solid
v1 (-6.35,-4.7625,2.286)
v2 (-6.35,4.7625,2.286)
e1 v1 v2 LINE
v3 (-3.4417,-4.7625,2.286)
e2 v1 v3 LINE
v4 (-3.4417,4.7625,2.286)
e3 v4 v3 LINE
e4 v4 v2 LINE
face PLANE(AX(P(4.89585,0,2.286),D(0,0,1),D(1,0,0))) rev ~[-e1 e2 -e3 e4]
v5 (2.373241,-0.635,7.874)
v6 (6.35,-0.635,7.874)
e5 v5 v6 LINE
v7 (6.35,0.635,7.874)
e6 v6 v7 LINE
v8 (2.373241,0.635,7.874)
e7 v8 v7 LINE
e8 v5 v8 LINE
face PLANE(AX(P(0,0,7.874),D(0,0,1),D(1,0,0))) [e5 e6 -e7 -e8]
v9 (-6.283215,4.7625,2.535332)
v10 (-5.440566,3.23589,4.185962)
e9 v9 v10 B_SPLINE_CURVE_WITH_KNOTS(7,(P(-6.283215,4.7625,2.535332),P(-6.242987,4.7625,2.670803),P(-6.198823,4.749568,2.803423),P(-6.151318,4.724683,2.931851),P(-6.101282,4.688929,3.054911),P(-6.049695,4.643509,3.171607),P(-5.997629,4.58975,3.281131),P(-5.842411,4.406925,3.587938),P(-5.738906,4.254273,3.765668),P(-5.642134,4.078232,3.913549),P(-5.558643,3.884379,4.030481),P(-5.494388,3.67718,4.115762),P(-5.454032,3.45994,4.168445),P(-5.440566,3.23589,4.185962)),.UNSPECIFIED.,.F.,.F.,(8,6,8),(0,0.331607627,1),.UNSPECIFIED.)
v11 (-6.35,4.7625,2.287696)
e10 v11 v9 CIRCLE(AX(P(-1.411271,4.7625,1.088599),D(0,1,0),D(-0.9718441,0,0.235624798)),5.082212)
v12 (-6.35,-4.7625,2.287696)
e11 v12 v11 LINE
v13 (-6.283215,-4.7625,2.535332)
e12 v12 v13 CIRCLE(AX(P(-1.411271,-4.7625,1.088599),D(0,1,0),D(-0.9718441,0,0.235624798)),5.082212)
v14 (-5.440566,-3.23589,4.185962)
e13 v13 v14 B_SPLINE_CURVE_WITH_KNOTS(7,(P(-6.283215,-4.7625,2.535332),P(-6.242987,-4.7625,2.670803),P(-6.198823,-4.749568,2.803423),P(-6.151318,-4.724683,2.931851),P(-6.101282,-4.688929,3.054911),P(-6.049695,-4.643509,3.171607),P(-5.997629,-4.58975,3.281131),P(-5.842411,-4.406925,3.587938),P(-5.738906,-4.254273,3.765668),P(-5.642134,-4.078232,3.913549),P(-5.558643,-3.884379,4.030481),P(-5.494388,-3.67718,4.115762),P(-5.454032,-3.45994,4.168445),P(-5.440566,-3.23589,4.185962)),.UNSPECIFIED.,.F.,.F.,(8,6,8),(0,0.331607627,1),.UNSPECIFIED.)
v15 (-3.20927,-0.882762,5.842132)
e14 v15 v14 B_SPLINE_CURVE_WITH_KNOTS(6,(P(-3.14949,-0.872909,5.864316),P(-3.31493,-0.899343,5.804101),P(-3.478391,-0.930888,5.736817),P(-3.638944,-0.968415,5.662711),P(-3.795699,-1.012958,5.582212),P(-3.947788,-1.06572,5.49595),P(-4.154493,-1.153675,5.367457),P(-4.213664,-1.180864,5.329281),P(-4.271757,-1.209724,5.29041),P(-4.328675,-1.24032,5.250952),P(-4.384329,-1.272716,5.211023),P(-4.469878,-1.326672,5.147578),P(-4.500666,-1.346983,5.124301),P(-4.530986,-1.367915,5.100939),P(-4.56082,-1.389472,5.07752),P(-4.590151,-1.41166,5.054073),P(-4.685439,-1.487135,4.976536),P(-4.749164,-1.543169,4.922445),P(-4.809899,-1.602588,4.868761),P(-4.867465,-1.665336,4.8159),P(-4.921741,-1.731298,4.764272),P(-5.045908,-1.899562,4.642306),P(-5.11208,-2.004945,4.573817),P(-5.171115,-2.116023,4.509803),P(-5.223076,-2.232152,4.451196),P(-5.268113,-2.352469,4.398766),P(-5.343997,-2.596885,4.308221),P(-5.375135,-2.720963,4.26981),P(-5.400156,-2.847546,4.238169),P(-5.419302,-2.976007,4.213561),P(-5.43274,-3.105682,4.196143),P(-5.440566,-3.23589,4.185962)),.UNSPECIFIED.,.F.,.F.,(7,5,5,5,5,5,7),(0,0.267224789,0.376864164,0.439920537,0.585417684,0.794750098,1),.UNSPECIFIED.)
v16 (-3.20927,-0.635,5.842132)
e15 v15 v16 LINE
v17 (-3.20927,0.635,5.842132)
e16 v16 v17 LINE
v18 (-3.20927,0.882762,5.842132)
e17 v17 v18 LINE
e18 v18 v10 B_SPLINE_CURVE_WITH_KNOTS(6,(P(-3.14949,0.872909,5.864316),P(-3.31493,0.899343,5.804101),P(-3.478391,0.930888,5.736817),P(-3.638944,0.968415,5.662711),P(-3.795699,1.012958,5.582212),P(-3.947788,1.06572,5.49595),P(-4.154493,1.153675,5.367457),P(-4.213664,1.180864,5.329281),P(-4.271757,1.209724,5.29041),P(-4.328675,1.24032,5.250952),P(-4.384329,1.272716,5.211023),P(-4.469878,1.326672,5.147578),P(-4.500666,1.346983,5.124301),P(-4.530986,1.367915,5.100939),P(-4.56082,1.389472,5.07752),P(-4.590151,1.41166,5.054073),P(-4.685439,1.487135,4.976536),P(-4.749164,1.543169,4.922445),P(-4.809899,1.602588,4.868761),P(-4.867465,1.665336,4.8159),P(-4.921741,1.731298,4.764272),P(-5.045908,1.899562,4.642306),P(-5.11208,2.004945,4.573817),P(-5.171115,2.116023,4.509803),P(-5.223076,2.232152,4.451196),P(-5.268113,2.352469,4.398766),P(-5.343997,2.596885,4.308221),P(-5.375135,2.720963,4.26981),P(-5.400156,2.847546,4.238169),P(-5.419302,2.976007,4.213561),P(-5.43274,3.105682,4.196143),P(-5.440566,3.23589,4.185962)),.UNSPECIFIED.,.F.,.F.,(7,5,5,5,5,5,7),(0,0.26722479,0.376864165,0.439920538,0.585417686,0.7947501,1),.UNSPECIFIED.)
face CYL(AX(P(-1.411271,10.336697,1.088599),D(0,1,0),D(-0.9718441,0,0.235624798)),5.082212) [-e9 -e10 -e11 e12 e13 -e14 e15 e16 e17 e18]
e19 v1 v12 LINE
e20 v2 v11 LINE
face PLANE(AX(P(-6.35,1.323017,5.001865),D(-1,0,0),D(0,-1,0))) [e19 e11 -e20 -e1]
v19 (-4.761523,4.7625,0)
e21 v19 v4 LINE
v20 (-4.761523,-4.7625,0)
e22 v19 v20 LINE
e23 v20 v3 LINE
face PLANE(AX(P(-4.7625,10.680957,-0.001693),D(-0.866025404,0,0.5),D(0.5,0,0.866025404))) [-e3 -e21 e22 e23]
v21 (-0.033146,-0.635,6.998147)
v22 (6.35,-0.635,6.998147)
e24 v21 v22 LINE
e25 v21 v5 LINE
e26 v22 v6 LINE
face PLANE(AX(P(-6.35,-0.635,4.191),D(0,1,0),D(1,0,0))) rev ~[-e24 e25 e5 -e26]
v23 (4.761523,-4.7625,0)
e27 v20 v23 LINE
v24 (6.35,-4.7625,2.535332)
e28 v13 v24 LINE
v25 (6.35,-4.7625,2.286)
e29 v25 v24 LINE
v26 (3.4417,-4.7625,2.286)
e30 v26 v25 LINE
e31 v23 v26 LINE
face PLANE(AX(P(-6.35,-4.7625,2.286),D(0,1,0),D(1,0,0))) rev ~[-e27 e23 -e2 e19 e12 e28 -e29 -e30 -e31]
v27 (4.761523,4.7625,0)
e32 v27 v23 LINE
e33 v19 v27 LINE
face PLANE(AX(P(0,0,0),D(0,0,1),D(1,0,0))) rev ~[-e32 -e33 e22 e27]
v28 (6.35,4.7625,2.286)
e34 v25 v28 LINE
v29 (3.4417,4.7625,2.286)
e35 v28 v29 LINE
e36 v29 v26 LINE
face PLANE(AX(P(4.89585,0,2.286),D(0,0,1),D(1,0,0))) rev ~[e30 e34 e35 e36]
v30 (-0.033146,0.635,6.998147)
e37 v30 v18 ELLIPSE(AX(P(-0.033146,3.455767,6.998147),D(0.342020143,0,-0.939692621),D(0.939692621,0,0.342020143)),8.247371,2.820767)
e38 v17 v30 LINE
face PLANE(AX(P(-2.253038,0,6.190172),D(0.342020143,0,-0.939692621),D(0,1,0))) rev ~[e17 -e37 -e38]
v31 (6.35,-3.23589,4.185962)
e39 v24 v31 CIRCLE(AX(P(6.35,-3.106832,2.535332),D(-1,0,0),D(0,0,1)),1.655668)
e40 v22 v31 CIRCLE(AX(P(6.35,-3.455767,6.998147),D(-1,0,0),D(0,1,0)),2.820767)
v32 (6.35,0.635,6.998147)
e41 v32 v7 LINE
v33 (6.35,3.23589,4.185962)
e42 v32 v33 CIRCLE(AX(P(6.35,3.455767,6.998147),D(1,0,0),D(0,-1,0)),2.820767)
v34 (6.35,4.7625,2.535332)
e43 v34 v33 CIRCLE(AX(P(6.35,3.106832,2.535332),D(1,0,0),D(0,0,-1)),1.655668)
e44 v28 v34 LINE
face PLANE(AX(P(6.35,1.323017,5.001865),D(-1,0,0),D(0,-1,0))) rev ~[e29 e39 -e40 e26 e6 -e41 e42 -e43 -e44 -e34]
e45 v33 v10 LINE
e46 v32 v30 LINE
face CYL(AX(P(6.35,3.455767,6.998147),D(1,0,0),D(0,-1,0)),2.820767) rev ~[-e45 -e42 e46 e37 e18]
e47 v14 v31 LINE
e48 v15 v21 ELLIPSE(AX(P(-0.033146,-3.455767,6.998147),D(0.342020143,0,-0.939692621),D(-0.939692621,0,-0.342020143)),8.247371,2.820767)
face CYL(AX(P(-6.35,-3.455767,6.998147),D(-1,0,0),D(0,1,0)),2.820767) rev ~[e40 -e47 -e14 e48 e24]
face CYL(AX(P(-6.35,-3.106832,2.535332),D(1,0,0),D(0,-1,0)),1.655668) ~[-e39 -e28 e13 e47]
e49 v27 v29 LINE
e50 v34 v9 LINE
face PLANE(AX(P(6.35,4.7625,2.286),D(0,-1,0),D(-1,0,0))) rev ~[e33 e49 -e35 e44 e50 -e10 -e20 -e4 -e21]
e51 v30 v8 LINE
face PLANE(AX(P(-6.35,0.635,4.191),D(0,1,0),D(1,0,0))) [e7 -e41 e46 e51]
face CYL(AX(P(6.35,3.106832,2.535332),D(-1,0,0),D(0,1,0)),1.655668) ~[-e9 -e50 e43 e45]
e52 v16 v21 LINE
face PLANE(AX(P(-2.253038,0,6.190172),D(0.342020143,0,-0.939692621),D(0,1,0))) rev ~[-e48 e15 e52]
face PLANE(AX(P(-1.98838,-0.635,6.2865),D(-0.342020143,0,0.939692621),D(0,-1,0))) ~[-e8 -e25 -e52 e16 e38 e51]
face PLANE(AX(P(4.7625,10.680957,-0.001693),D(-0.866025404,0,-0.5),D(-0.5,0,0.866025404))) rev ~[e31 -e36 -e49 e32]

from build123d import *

# Parameters (mm, degrees)
F0_W         = 9.525
F0_H         = 9.525
F1_DEPTH     = 2.286
F2_T1_DEPTH  = 21.3619144247
F3_W         = 2.9083
F3_H         = 9.525
F3_W_2       = 6.8834
F4_DEPTH     = 1.905
F5_R         = 1.6556676611
F6_W         = 12.7
F6_H         = 1.27
F7_DEPTH     = 3.683
F8_SIZE2     = 8.7232408068
F8_SIZE      = 3.175
F9_T4_DEPTH  = 12.7
F9_T9_DEPTH  = 12.7
F10_T1_DEPTH = 20.6733949541


# Not quite as in the source:
# - a fillet or chamfer that OpenCascade refuses, or shapes differently, is made with other operations: its cross-section is extruded or revolved along the edge and cut away or added


with BuildPart() as f1:
    # F0 (on Top) → F1 (new body)
    with BuildSketch(Plane.XY):
        Rectangle(F0_W, F0_H)
    extrude(amount=F1_DEPTH)

    # F2: chamfer of 1.3208 x 2.2876927066 on 2 edges, made by hand

    # F2_s2 → F2_t1 (cut)
    with BuildSketch(Plane.XZ.offset(-10.6809572123)):
        Polygon((-4.7625, -0.0016927066), (-3.4417, 2.286), (-4.7625, 2.286), align=None)
        Polygon((4.7625, -0.0016927066), (3.4417, 2.286), (4.7625, 2.286), align=None)
    extrude(amount=F2_T1_DEPTH, mode=Mode.SUBTRACT)

    # F3 (on face) → F4 (join)
    with BuildSketch(Plane.XY.offset(2.286)):
        with Locations((4.89585, 0)):
            Rectangle(F3_W, F3_H)
        Rectangle(F3_W_2, F3_H)
        with Locations((-4.89585, 0)):
            Rectangle(F3_W, F3_H)
    extrude(amount=F4_DEPTH)

    # F5
    f5_edges = [f1.edges().sort_by_distance(p)[0] for p in [
        (0, 4.7625, 4.191),
        (0, -4.7625, 4.191),
    ]]
    fillet(f5_edges, radius=F5_R)

    # F6 (on face) → F7 (join)
    with BuildSketch(Plane.XY.offset(4.191)):
        Rectangle(F6_W, F6_H)
    extrude(amount=F7_DEPTH)

    # F8
    f8_edges = [f1.edges().sort_by_distance(p)[0] for p in [
        (-6.35, 0, 7.874),
    ]]
    f8_side = f1.faces().sort_by_distance((-6.35, 0, 3.810575))[0]
    chamfer(f8_edges, length=F8_SIZE, length2=F8_SIZE2, reference=f8_side)

    # F9: fillet of radius 2.8207671263 on 2 edges, made by hand


with BuildPart() as f9_tool2:
    # F9_s3 → F9_t4 (new body)
    with BuildSketch(Plane.YZ.offset(-6.35)):
        with BuildLine():
            ThreePointArc((-0.635, 6.9981468006), (-1.3849039981, 5.0828783899), (-3.235890411, 4.1859623453))
            Line((-3.235890411, 4.1859623453), (-3.2139027394, 3.9047438998))
            ThreePointArc((-3.2139027394, 3.9047438998), (-3.1068323389, 3.9089232874), (-0.635, 3.9089232874))
            Line((-0.635, 3.9089232874), (-0.3529232874, 4.191))
            Line((-0.3529232874, 4.191), (-0.3529232874, 6.9981468006))
            Line((-0.3529232874, 6.9981468006), (-0.635, 6.9981468006))
        make_face()
    extrude(amount=F9_T4_DEPTH)

    split(bisect_by=Plane(origin=(-2.2530383821, 0, 6.1901720799), x_dir=(0, 1, 0), z_dir=(0.3420201433, 0, -0.9396926208)), keep=Keep.TOP)


with BuildPart() as f1_1:
    add(f1.part)

    # F9_t1: union F9_tool2
    add(f9_tool2.part)


with BuildPart() as f9_tool7:
    # F9_s8 → F9_t9 (new body)
    with BuildSketch(Plane.YZ.offset(6.35)):
        with BuildLine():
            ThreePointArc((0.635, 6.9981468006), (1.3849039981, 5.0828783899), (3.235890411, 4.1859623453))
            Line((3.235890411, 4.1859623453), (3.2139027394, 3.9047438998))
            ThreePointArc((3.2139027394, 3.9047438998), (3.1068323389, 3.9089232874), (0.635, 3.9089232874))
            Line((0.635, 3.9089232874), (0.3529232874, 4.191))
            Line((0.3529232874, 4.191), (0.3529232874, 6.9981468006))
            Line((0.3529232874, 6.9981468006), (0.635, 6.9981468006))
        make_face()
    extrude(amount=-F9_T9_DEPTH)

    split(bisect_by=Plane(origin=(-2.2530383821, 0, 6.1901720799), x_dir=(0, 1, 0), z_dir=(0.3420201433, 0, -0.9396926208)), keep=Keep.TOP)


with BuildPart() as f1_2:
    add(f1_1.part)

    # F9_t6: union F9_tool7
    add(f9_tool7.part)

    # F10: fillet of radius 5.08 on 1 edges, made by hand

    # F10_s2 → F10_t1 (cut)
    with BuildSketch(Plane.XZ.offset(-10.336697477)):
        with BuildLine():
            ThreePointArc((-6.3503887376, 2.2860942499), (-5.1990968175, 4.4769990033), (-3.1494899918, 5.8643160486))
            Line((-3.1494899918, 5.8643160486), (-3.3233118727, 6.3418877414))
            ThreePointArc((-3.3233118727, 6.3418877414), (-4.9234984728, 5.7590417786), (-6.5238218809, 5.1765716928))
            Line((-6.5238218809, 5.1765716928), (-6.8582211803, 4.699))
            ThreePointArc((-6.8582211803, 4.699), (-6.8582211803, 3.492547125), (-6.8443004931, 2.4058437629))
            Line((-6.8443004931, 2.4058437629), (-6.3503887376, 2.2860942499))
        make_face()
    extrude(amount=F10_T1_DEPTH, mode=Mode.SUBTRACT)


solid = f1_2.part
